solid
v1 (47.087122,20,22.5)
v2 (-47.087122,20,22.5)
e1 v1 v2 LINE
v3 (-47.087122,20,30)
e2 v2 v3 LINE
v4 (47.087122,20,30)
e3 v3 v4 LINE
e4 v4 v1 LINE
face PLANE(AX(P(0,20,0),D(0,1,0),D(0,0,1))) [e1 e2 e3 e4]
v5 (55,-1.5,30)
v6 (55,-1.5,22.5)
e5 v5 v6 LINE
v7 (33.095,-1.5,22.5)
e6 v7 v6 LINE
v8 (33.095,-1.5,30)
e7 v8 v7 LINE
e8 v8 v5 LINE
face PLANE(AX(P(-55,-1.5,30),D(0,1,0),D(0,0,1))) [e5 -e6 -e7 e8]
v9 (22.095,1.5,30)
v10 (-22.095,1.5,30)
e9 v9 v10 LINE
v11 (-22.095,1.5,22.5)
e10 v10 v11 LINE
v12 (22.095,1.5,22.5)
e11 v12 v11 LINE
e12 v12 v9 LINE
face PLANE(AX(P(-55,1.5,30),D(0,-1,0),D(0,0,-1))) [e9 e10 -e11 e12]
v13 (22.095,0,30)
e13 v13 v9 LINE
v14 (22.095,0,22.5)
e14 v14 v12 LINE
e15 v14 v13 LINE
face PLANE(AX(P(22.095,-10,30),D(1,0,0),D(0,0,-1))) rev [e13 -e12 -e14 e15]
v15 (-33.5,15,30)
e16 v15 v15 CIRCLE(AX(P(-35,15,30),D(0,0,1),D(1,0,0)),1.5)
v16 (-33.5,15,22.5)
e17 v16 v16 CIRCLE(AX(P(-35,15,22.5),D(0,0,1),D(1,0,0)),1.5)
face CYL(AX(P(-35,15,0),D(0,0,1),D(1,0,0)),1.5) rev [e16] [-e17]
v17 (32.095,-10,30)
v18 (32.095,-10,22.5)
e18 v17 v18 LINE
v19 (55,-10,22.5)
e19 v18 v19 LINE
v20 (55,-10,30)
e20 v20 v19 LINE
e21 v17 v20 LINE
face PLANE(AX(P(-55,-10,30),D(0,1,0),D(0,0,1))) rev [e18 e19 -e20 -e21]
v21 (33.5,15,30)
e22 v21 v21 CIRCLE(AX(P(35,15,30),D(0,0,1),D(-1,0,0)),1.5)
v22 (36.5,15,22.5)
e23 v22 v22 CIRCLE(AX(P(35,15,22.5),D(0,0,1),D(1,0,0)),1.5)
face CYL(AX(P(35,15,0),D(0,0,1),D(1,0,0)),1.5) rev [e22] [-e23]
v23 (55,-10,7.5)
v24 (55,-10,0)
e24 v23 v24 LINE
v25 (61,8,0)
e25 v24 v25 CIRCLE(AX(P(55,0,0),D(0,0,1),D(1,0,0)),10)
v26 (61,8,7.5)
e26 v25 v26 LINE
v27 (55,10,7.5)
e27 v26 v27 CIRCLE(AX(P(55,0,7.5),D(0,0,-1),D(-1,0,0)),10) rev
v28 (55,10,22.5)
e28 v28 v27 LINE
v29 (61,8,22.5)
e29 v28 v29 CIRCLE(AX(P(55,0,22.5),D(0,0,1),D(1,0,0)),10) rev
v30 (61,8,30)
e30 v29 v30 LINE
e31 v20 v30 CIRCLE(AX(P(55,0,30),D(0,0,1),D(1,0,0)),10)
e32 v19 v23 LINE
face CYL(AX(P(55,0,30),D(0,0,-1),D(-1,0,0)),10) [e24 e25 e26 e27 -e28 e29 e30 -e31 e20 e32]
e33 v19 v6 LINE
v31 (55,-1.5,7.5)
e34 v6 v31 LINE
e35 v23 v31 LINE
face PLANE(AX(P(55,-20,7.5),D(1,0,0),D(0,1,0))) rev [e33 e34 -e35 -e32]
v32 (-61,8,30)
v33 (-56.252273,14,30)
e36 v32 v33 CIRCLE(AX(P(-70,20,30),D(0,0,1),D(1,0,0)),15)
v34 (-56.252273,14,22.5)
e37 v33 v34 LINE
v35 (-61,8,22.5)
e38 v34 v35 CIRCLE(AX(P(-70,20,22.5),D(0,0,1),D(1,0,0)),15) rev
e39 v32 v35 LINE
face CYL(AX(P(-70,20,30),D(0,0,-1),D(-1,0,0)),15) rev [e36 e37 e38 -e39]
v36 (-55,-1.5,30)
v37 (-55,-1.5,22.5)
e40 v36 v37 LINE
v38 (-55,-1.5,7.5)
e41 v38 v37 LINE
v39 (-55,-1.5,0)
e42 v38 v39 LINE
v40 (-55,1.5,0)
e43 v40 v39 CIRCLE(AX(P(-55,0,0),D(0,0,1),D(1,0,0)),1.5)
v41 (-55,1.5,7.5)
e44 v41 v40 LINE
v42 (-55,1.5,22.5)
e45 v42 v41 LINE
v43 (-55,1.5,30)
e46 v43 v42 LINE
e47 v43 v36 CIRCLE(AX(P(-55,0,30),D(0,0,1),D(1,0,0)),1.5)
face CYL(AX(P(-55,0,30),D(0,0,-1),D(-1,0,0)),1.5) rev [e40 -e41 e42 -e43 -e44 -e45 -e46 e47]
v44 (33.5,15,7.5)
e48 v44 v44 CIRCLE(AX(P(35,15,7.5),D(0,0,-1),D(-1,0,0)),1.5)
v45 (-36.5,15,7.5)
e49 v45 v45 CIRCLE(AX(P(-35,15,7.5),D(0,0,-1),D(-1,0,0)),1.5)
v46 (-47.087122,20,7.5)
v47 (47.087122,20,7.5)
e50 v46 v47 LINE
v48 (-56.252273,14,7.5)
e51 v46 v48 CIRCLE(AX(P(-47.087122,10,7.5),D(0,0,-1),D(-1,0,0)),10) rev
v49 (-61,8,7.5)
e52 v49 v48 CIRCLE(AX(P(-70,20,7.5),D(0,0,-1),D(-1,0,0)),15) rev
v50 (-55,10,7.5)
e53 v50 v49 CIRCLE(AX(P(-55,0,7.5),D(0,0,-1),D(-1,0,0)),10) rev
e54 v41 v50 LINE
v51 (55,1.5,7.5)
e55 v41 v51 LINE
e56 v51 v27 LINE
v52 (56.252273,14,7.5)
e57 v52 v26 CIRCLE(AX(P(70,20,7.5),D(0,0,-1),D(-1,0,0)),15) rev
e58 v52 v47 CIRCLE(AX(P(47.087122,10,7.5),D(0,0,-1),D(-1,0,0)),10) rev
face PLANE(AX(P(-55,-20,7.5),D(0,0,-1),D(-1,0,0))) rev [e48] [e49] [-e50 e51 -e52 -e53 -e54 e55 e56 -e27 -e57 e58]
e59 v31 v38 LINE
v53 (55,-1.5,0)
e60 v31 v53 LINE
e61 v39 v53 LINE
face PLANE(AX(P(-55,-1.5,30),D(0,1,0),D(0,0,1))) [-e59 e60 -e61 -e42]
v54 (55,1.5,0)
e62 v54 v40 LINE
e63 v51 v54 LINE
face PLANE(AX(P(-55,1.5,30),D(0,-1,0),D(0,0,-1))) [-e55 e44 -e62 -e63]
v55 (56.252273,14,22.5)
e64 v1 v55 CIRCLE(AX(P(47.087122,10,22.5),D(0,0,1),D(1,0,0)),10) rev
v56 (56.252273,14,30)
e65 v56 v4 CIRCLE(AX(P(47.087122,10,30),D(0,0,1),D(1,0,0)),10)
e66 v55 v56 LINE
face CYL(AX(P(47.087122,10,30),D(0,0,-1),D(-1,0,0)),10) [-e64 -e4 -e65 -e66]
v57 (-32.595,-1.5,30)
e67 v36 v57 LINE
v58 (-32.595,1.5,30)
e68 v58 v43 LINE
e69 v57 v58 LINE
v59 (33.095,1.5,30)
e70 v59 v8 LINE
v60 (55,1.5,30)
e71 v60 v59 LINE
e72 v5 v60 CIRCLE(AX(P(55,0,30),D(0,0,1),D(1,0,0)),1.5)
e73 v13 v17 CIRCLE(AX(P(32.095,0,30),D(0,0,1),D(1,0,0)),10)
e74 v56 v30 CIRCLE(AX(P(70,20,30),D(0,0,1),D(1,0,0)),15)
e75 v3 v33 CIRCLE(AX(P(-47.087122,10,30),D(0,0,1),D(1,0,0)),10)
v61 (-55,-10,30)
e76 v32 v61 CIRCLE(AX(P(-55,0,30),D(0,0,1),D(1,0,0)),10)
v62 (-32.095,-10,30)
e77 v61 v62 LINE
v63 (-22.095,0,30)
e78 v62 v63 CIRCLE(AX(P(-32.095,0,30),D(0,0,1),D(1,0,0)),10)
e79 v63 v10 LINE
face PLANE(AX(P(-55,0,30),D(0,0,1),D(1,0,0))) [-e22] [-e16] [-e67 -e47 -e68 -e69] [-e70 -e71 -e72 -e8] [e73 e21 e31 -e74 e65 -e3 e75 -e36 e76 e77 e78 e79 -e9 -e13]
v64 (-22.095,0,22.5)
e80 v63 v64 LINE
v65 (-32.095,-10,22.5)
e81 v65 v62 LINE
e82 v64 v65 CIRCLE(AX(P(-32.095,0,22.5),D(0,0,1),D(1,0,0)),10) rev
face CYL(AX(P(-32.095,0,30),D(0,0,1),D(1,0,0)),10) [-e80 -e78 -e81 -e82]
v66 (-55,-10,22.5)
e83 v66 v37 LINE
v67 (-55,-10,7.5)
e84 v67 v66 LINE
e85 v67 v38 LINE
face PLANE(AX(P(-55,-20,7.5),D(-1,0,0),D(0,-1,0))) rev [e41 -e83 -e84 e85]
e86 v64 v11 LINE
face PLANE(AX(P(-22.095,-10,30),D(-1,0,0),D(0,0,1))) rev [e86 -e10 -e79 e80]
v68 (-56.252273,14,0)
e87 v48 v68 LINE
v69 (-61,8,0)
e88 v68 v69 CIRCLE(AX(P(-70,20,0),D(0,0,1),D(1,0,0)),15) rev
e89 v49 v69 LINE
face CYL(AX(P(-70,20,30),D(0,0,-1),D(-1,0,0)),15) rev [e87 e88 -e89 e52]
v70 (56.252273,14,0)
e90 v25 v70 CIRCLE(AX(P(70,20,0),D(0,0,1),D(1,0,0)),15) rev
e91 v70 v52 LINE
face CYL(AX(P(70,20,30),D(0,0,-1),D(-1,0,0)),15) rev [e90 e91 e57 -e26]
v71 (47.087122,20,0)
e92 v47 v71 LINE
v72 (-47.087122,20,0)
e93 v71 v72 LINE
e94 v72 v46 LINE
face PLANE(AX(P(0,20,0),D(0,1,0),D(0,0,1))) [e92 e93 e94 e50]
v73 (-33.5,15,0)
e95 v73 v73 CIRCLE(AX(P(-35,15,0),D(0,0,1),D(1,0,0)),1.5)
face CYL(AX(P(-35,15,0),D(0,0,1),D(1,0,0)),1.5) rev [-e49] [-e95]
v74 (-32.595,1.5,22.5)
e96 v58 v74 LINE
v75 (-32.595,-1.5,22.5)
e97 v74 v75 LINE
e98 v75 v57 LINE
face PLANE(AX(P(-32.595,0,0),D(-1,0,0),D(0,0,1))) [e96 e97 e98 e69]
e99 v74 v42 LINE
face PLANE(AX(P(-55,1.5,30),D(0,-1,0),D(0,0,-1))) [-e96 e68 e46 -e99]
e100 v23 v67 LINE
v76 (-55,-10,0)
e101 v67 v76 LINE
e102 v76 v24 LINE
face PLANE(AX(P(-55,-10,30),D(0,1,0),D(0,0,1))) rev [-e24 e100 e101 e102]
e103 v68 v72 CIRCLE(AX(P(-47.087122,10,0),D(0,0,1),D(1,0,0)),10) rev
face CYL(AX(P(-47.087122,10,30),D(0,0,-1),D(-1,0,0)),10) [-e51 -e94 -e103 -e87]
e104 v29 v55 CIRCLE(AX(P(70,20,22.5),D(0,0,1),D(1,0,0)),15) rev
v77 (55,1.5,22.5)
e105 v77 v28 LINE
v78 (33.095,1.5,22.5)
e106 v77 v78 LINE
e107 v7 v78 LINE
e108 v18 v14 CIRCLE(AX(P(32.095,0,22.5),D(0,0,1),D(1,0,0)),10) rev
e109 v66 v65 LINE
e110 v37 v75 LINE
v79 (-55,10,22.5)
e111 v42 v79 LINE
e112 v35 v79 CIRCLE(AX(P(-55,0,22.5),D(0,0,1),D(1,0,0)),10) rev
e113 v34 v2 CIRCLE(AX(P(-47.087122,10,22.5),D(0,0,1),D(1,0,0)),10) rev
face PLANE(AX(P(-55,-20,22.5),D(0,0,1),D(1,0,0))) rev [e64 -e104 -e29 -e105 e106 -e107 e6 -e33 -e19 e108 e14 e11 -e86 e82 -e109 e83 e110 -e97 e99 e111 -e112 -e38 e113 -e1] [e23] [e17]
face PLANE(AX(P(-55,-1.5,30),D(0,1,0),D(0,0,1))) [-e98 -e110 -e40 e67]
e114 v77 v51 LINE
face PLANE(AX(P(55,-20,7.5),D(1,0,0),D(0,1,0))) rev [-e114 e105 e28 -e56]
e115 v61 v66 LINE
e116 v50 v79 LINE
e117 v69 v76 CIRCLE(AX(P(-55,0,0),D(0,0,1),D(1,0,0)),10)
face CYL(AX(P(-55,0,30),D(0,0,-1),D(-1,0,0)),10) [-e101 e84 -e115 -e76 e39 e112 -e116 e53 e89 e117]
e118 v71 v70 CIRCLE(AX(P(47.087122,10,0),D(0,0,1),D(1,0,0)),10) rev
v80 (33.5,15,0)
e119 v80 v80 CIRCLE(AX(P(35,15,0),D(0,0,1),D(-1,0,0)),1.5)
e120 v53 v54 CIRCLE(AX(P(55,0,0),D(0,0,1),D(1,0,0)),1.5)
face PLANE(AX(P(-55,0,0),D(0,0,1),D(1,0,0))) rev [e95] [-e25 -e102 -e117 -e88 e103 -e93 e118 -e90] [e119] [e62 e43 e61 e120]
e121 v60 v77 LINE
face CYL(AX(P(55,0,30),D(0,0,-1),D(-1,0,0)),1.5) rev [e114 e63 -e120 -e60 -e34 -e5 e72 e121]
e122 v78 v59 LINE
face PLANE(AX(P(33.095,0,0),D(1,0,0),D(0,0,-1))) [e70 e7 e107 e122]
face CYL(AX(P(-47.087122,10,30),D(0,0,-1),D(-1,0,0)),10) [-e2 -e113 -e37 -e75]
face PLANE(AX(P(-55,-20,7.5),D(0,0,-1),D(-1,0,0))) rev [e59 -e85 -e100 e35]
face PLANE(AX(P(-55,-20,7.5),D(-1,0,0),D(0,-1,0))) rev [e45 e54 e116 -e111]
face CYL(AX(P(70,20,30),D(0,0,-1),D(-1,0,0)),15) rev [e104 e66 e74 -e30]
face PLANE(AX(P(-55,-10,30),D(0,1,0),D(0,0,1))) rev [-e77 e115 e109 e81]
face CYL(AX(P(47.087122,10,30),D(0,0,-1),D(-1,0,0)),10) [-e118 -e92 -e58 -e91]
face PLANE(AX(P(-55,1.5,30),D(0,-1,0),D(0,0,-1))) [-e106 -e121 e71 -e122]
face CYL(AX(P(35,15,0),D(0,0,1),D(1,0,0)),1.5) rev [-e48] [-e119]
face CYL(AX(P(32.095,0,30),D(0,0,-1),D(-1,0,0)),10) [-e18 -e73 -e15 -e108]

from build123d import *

# Parameters (mm, degrees)
BOSS_EXTRU_1_DEPTH           = 30
ESQUISSE2_W                  = 110
ESQUISSE2_H                  = 15
ENL_V_MAT_EXTRU_1_DEPTH      = 30
ENL_V_START                  = -10
ESQUISSE3_W                  = 44.19
ESQUISSE3_H                  = 7.5
ENL_V_MAT_EXTRU_2_DEPTH      = 10
ESQUISSE4_W                  = 5
ESQUISSE4_H                  = 7.5
BOSS_EXTRU_2_DEPTH           = 10
ESQUISSE5_W                  = 7.5
ESQUISSE5_H                  = 3
BOSS_EXTRU_3_DEPTH           = 6
ESQUISSE6_W                  = 7.5
ESQUISSE6_H                  = 3
BOSS_EXTRU_4_DEPTH           = 5.5
CONG_1_R                     = 10
ESQUISSE7_W                  = 110
ESQUISSE7_H                  = 7.5
BOSS_EXTRU_5_DEPTH           = 10
ENL_V_MAT_EXTRU_3_DEPTH      = 72.632743909
ENL_V_MAT_EXTRU_3_DEPTH_BACK = 72.632743909
ESQUISSE8_R                  = 1.5
CONG_2_R                     = 15
CONG_3_R                     = 15
CONG_4_R                     = 15
CONG_5_R                     = 15
CONG_6_R                     = 10


with BuildPart() as part:
    # Esquisse1 → Boss.-Extru.1 (new body)
    with BuildSketch(Plane.XY):
        with BuildLine():
            Line((-55, 10), (55, 10))
            ThreePointArc((55, 10), (65, 0), (55, -10))
            Line((55, -10), (-55, -10))
            ThreePointArc((-55, -10), (-65, 0), (-55, 10))
        make_face()
        with BuildLine():
            Line((-55, 1.5), (55, 1.5))
            ThreePointArc((55, 1.5), (56.5, 0), (55, -1.5))
            Line((55, -1.5), (-55, -1.5))
            ThreePointArc((-55, -1.5), (-56.5, 0), (-55, 1.5))
        make_face(mode=Mode.SUBTRACT)
    extrude(amount=BOSS_EXTRU_1_DEPTH)

    # Esquisse2 → Enlèv. mat.-Extru.1 (cut)
    with BuildSketch(Plane(origin=(0, 10, 0), x_dir=(1, 0, 0), z_dir=(0, 1, 0))):
        with Locations((0, -15)):
            Rectangle(ESQUISSE2_W, ESQUISSE2_H)
    extrude(amount=-ENL_V_MAT_EXTRU_1_DEPTH, mode=Mode.SUBTRACT)

    # Esquisse3 → Enlèv. mat.-Extru.2 (cut)
    with BuildSketch(Plane(origin=(0, 10, 0), x_dir=(1, 0, 0), z_dir=(0, 1, 0)).offset(ENL_V_START)):
        with Locations((0, -26.25)):
            Rectangle(ESQUISSE3_W, ESQUISSE3_H)
    extrude(amount=-ENL_V_MAT_EXTRU_2_DEPTH, mode=Mode.SUBTRACT)

    # Esquisse4 → Boss.-Extru.2 (add)
    with BuildSketch(Plane(origin=(0, -1.5, 0), x_dir=(1, 0, 0), z_dir=(0, 1, 0))):
        with Locations((-24.595, -26.25)):
            Rectangle(ESQUISSE4_W, ESQUISSE4_H)
        with Locations((24.595, -26.25)):
            Rectangle(ESQUISSE4_W, ESQUISSE4_H)
    extrude(amount=BOSS_EXTRU_2_DEPTH)

    # Esquisse5 → Boss.-Extru.3 (add)
    with BuildSketch(Plane(origin=(27.095, 0, 0), x_dir=(0, 0, -1), z_dir=(1, 0, 0))):
        with Locations((-26.25, 0)):
            Rectangle(ESQUISSE5_W, ESQUISSE5_H)
    extrude(amount=BOSS_EXTRU_3_DEPTH)

    # Esquisse6 → Boss.-Extru.4 (add)
    with BuildSketch(Plane.ZY.offset(27.095)):
        with Locations((26.25, 0)):
            Rectangle(ESQUISSE6_W, ESQUISSE6_H)
    extrude(amount=BOSS_EXTRU_4_DEPTH)

    # Congé1
    cong_1_edges = [part.edges().sort_by_distance(p)[0] for p in [
        (22.095, -10, 26.25),
        (-22.095, -10, 26.25),
    ]]
    fillet(cong_1_edges, radius=CONG_1_R)

    # Esquisse7 → Boss.-Extru.5 (add)
    with BuildSketch(Plane(origin=(0, 10, 0), x_dir=(1, 0, 0), z_dir=(0, 1, 0))):
        with Locations((0, -3.75)):
            Rectangle(ESQUISSE7_W, ESQUISSE7_H)
        with Locations((0, -26.25)):
            Rectangle(ESQUISSE7_W, ESQUISSE7_H)
    extrude(amount=BOSS_EXTRU_5_DEPTH)

    # Esquisse8 → Enlèv. mat.-Extru.3 (cut, two sides: drawn at the far end of the back side and taken through both)
    with BuildSketch(Plane.XY.offset(7.5).offset(-ENL_V_MAT_EXTRU_3_DEPTH_BACK)):
        with Locations((-35, 15)):
            Circle(ESQUISSE8_R)
        with Locations((35, 15)):
            Circle(ESQUISSE8_R)
    extrude(amount=ENL_V_MAT_EXTRU_3_DEPTH + ENL_V_MAT_EXTRU_3_DEPTH_BACK, mode=Mode.SUBTRACT)

    # Congé2
    cong_2_edges = [part.edges().sort_by_distance(p)[0] for p in [
        (-55, 10, 3.75),
    ]]
    fillet(cong_2_edges, radius=CONG_2_R - 0.0001)  # a hair under: the kernel refuses the full size

    # Congé3
    cong_3_edges = [part.edges().sort_by_distance(p)[0] for p in [
        (55, 10, 3.75),
    ]]
    fillet(cong_3_edges, radius=CONG_3_R - 0.0001)  # a hair under: the kernel refuses the full size

    # Congé4
    cong_4_edges = [part.edges().sort_by_distance(p)[0] for p in [
        (-55, 10, 26.25),
    ]]
    fillet(cong_4_edges, radius=CONG_4_R - 0.0001)  # a hair under: the kernel refuses the full size

    # Congé5
    cong_5_edges = [part.edges().sort_by_distance(p)[0] for p in [
        (55, 10, 26.25),
    ]]
    fillet(cong_5_edges, radius=CONG_5_R - 0.0001)  # a hair under: the kernel refuses the full size

    # Congé6
    cong_6_edges = [part.edges().sort_by_distance(p)[0] for p in [
        (-55, 20, 3.75),
        (55, 20, 3.75),
        (55, 20, 26.25),
        (-55, 20, 26.25),
    ]]
    fillet(cong_6_edges, radius=CONG_6_R)


solid = part.part
